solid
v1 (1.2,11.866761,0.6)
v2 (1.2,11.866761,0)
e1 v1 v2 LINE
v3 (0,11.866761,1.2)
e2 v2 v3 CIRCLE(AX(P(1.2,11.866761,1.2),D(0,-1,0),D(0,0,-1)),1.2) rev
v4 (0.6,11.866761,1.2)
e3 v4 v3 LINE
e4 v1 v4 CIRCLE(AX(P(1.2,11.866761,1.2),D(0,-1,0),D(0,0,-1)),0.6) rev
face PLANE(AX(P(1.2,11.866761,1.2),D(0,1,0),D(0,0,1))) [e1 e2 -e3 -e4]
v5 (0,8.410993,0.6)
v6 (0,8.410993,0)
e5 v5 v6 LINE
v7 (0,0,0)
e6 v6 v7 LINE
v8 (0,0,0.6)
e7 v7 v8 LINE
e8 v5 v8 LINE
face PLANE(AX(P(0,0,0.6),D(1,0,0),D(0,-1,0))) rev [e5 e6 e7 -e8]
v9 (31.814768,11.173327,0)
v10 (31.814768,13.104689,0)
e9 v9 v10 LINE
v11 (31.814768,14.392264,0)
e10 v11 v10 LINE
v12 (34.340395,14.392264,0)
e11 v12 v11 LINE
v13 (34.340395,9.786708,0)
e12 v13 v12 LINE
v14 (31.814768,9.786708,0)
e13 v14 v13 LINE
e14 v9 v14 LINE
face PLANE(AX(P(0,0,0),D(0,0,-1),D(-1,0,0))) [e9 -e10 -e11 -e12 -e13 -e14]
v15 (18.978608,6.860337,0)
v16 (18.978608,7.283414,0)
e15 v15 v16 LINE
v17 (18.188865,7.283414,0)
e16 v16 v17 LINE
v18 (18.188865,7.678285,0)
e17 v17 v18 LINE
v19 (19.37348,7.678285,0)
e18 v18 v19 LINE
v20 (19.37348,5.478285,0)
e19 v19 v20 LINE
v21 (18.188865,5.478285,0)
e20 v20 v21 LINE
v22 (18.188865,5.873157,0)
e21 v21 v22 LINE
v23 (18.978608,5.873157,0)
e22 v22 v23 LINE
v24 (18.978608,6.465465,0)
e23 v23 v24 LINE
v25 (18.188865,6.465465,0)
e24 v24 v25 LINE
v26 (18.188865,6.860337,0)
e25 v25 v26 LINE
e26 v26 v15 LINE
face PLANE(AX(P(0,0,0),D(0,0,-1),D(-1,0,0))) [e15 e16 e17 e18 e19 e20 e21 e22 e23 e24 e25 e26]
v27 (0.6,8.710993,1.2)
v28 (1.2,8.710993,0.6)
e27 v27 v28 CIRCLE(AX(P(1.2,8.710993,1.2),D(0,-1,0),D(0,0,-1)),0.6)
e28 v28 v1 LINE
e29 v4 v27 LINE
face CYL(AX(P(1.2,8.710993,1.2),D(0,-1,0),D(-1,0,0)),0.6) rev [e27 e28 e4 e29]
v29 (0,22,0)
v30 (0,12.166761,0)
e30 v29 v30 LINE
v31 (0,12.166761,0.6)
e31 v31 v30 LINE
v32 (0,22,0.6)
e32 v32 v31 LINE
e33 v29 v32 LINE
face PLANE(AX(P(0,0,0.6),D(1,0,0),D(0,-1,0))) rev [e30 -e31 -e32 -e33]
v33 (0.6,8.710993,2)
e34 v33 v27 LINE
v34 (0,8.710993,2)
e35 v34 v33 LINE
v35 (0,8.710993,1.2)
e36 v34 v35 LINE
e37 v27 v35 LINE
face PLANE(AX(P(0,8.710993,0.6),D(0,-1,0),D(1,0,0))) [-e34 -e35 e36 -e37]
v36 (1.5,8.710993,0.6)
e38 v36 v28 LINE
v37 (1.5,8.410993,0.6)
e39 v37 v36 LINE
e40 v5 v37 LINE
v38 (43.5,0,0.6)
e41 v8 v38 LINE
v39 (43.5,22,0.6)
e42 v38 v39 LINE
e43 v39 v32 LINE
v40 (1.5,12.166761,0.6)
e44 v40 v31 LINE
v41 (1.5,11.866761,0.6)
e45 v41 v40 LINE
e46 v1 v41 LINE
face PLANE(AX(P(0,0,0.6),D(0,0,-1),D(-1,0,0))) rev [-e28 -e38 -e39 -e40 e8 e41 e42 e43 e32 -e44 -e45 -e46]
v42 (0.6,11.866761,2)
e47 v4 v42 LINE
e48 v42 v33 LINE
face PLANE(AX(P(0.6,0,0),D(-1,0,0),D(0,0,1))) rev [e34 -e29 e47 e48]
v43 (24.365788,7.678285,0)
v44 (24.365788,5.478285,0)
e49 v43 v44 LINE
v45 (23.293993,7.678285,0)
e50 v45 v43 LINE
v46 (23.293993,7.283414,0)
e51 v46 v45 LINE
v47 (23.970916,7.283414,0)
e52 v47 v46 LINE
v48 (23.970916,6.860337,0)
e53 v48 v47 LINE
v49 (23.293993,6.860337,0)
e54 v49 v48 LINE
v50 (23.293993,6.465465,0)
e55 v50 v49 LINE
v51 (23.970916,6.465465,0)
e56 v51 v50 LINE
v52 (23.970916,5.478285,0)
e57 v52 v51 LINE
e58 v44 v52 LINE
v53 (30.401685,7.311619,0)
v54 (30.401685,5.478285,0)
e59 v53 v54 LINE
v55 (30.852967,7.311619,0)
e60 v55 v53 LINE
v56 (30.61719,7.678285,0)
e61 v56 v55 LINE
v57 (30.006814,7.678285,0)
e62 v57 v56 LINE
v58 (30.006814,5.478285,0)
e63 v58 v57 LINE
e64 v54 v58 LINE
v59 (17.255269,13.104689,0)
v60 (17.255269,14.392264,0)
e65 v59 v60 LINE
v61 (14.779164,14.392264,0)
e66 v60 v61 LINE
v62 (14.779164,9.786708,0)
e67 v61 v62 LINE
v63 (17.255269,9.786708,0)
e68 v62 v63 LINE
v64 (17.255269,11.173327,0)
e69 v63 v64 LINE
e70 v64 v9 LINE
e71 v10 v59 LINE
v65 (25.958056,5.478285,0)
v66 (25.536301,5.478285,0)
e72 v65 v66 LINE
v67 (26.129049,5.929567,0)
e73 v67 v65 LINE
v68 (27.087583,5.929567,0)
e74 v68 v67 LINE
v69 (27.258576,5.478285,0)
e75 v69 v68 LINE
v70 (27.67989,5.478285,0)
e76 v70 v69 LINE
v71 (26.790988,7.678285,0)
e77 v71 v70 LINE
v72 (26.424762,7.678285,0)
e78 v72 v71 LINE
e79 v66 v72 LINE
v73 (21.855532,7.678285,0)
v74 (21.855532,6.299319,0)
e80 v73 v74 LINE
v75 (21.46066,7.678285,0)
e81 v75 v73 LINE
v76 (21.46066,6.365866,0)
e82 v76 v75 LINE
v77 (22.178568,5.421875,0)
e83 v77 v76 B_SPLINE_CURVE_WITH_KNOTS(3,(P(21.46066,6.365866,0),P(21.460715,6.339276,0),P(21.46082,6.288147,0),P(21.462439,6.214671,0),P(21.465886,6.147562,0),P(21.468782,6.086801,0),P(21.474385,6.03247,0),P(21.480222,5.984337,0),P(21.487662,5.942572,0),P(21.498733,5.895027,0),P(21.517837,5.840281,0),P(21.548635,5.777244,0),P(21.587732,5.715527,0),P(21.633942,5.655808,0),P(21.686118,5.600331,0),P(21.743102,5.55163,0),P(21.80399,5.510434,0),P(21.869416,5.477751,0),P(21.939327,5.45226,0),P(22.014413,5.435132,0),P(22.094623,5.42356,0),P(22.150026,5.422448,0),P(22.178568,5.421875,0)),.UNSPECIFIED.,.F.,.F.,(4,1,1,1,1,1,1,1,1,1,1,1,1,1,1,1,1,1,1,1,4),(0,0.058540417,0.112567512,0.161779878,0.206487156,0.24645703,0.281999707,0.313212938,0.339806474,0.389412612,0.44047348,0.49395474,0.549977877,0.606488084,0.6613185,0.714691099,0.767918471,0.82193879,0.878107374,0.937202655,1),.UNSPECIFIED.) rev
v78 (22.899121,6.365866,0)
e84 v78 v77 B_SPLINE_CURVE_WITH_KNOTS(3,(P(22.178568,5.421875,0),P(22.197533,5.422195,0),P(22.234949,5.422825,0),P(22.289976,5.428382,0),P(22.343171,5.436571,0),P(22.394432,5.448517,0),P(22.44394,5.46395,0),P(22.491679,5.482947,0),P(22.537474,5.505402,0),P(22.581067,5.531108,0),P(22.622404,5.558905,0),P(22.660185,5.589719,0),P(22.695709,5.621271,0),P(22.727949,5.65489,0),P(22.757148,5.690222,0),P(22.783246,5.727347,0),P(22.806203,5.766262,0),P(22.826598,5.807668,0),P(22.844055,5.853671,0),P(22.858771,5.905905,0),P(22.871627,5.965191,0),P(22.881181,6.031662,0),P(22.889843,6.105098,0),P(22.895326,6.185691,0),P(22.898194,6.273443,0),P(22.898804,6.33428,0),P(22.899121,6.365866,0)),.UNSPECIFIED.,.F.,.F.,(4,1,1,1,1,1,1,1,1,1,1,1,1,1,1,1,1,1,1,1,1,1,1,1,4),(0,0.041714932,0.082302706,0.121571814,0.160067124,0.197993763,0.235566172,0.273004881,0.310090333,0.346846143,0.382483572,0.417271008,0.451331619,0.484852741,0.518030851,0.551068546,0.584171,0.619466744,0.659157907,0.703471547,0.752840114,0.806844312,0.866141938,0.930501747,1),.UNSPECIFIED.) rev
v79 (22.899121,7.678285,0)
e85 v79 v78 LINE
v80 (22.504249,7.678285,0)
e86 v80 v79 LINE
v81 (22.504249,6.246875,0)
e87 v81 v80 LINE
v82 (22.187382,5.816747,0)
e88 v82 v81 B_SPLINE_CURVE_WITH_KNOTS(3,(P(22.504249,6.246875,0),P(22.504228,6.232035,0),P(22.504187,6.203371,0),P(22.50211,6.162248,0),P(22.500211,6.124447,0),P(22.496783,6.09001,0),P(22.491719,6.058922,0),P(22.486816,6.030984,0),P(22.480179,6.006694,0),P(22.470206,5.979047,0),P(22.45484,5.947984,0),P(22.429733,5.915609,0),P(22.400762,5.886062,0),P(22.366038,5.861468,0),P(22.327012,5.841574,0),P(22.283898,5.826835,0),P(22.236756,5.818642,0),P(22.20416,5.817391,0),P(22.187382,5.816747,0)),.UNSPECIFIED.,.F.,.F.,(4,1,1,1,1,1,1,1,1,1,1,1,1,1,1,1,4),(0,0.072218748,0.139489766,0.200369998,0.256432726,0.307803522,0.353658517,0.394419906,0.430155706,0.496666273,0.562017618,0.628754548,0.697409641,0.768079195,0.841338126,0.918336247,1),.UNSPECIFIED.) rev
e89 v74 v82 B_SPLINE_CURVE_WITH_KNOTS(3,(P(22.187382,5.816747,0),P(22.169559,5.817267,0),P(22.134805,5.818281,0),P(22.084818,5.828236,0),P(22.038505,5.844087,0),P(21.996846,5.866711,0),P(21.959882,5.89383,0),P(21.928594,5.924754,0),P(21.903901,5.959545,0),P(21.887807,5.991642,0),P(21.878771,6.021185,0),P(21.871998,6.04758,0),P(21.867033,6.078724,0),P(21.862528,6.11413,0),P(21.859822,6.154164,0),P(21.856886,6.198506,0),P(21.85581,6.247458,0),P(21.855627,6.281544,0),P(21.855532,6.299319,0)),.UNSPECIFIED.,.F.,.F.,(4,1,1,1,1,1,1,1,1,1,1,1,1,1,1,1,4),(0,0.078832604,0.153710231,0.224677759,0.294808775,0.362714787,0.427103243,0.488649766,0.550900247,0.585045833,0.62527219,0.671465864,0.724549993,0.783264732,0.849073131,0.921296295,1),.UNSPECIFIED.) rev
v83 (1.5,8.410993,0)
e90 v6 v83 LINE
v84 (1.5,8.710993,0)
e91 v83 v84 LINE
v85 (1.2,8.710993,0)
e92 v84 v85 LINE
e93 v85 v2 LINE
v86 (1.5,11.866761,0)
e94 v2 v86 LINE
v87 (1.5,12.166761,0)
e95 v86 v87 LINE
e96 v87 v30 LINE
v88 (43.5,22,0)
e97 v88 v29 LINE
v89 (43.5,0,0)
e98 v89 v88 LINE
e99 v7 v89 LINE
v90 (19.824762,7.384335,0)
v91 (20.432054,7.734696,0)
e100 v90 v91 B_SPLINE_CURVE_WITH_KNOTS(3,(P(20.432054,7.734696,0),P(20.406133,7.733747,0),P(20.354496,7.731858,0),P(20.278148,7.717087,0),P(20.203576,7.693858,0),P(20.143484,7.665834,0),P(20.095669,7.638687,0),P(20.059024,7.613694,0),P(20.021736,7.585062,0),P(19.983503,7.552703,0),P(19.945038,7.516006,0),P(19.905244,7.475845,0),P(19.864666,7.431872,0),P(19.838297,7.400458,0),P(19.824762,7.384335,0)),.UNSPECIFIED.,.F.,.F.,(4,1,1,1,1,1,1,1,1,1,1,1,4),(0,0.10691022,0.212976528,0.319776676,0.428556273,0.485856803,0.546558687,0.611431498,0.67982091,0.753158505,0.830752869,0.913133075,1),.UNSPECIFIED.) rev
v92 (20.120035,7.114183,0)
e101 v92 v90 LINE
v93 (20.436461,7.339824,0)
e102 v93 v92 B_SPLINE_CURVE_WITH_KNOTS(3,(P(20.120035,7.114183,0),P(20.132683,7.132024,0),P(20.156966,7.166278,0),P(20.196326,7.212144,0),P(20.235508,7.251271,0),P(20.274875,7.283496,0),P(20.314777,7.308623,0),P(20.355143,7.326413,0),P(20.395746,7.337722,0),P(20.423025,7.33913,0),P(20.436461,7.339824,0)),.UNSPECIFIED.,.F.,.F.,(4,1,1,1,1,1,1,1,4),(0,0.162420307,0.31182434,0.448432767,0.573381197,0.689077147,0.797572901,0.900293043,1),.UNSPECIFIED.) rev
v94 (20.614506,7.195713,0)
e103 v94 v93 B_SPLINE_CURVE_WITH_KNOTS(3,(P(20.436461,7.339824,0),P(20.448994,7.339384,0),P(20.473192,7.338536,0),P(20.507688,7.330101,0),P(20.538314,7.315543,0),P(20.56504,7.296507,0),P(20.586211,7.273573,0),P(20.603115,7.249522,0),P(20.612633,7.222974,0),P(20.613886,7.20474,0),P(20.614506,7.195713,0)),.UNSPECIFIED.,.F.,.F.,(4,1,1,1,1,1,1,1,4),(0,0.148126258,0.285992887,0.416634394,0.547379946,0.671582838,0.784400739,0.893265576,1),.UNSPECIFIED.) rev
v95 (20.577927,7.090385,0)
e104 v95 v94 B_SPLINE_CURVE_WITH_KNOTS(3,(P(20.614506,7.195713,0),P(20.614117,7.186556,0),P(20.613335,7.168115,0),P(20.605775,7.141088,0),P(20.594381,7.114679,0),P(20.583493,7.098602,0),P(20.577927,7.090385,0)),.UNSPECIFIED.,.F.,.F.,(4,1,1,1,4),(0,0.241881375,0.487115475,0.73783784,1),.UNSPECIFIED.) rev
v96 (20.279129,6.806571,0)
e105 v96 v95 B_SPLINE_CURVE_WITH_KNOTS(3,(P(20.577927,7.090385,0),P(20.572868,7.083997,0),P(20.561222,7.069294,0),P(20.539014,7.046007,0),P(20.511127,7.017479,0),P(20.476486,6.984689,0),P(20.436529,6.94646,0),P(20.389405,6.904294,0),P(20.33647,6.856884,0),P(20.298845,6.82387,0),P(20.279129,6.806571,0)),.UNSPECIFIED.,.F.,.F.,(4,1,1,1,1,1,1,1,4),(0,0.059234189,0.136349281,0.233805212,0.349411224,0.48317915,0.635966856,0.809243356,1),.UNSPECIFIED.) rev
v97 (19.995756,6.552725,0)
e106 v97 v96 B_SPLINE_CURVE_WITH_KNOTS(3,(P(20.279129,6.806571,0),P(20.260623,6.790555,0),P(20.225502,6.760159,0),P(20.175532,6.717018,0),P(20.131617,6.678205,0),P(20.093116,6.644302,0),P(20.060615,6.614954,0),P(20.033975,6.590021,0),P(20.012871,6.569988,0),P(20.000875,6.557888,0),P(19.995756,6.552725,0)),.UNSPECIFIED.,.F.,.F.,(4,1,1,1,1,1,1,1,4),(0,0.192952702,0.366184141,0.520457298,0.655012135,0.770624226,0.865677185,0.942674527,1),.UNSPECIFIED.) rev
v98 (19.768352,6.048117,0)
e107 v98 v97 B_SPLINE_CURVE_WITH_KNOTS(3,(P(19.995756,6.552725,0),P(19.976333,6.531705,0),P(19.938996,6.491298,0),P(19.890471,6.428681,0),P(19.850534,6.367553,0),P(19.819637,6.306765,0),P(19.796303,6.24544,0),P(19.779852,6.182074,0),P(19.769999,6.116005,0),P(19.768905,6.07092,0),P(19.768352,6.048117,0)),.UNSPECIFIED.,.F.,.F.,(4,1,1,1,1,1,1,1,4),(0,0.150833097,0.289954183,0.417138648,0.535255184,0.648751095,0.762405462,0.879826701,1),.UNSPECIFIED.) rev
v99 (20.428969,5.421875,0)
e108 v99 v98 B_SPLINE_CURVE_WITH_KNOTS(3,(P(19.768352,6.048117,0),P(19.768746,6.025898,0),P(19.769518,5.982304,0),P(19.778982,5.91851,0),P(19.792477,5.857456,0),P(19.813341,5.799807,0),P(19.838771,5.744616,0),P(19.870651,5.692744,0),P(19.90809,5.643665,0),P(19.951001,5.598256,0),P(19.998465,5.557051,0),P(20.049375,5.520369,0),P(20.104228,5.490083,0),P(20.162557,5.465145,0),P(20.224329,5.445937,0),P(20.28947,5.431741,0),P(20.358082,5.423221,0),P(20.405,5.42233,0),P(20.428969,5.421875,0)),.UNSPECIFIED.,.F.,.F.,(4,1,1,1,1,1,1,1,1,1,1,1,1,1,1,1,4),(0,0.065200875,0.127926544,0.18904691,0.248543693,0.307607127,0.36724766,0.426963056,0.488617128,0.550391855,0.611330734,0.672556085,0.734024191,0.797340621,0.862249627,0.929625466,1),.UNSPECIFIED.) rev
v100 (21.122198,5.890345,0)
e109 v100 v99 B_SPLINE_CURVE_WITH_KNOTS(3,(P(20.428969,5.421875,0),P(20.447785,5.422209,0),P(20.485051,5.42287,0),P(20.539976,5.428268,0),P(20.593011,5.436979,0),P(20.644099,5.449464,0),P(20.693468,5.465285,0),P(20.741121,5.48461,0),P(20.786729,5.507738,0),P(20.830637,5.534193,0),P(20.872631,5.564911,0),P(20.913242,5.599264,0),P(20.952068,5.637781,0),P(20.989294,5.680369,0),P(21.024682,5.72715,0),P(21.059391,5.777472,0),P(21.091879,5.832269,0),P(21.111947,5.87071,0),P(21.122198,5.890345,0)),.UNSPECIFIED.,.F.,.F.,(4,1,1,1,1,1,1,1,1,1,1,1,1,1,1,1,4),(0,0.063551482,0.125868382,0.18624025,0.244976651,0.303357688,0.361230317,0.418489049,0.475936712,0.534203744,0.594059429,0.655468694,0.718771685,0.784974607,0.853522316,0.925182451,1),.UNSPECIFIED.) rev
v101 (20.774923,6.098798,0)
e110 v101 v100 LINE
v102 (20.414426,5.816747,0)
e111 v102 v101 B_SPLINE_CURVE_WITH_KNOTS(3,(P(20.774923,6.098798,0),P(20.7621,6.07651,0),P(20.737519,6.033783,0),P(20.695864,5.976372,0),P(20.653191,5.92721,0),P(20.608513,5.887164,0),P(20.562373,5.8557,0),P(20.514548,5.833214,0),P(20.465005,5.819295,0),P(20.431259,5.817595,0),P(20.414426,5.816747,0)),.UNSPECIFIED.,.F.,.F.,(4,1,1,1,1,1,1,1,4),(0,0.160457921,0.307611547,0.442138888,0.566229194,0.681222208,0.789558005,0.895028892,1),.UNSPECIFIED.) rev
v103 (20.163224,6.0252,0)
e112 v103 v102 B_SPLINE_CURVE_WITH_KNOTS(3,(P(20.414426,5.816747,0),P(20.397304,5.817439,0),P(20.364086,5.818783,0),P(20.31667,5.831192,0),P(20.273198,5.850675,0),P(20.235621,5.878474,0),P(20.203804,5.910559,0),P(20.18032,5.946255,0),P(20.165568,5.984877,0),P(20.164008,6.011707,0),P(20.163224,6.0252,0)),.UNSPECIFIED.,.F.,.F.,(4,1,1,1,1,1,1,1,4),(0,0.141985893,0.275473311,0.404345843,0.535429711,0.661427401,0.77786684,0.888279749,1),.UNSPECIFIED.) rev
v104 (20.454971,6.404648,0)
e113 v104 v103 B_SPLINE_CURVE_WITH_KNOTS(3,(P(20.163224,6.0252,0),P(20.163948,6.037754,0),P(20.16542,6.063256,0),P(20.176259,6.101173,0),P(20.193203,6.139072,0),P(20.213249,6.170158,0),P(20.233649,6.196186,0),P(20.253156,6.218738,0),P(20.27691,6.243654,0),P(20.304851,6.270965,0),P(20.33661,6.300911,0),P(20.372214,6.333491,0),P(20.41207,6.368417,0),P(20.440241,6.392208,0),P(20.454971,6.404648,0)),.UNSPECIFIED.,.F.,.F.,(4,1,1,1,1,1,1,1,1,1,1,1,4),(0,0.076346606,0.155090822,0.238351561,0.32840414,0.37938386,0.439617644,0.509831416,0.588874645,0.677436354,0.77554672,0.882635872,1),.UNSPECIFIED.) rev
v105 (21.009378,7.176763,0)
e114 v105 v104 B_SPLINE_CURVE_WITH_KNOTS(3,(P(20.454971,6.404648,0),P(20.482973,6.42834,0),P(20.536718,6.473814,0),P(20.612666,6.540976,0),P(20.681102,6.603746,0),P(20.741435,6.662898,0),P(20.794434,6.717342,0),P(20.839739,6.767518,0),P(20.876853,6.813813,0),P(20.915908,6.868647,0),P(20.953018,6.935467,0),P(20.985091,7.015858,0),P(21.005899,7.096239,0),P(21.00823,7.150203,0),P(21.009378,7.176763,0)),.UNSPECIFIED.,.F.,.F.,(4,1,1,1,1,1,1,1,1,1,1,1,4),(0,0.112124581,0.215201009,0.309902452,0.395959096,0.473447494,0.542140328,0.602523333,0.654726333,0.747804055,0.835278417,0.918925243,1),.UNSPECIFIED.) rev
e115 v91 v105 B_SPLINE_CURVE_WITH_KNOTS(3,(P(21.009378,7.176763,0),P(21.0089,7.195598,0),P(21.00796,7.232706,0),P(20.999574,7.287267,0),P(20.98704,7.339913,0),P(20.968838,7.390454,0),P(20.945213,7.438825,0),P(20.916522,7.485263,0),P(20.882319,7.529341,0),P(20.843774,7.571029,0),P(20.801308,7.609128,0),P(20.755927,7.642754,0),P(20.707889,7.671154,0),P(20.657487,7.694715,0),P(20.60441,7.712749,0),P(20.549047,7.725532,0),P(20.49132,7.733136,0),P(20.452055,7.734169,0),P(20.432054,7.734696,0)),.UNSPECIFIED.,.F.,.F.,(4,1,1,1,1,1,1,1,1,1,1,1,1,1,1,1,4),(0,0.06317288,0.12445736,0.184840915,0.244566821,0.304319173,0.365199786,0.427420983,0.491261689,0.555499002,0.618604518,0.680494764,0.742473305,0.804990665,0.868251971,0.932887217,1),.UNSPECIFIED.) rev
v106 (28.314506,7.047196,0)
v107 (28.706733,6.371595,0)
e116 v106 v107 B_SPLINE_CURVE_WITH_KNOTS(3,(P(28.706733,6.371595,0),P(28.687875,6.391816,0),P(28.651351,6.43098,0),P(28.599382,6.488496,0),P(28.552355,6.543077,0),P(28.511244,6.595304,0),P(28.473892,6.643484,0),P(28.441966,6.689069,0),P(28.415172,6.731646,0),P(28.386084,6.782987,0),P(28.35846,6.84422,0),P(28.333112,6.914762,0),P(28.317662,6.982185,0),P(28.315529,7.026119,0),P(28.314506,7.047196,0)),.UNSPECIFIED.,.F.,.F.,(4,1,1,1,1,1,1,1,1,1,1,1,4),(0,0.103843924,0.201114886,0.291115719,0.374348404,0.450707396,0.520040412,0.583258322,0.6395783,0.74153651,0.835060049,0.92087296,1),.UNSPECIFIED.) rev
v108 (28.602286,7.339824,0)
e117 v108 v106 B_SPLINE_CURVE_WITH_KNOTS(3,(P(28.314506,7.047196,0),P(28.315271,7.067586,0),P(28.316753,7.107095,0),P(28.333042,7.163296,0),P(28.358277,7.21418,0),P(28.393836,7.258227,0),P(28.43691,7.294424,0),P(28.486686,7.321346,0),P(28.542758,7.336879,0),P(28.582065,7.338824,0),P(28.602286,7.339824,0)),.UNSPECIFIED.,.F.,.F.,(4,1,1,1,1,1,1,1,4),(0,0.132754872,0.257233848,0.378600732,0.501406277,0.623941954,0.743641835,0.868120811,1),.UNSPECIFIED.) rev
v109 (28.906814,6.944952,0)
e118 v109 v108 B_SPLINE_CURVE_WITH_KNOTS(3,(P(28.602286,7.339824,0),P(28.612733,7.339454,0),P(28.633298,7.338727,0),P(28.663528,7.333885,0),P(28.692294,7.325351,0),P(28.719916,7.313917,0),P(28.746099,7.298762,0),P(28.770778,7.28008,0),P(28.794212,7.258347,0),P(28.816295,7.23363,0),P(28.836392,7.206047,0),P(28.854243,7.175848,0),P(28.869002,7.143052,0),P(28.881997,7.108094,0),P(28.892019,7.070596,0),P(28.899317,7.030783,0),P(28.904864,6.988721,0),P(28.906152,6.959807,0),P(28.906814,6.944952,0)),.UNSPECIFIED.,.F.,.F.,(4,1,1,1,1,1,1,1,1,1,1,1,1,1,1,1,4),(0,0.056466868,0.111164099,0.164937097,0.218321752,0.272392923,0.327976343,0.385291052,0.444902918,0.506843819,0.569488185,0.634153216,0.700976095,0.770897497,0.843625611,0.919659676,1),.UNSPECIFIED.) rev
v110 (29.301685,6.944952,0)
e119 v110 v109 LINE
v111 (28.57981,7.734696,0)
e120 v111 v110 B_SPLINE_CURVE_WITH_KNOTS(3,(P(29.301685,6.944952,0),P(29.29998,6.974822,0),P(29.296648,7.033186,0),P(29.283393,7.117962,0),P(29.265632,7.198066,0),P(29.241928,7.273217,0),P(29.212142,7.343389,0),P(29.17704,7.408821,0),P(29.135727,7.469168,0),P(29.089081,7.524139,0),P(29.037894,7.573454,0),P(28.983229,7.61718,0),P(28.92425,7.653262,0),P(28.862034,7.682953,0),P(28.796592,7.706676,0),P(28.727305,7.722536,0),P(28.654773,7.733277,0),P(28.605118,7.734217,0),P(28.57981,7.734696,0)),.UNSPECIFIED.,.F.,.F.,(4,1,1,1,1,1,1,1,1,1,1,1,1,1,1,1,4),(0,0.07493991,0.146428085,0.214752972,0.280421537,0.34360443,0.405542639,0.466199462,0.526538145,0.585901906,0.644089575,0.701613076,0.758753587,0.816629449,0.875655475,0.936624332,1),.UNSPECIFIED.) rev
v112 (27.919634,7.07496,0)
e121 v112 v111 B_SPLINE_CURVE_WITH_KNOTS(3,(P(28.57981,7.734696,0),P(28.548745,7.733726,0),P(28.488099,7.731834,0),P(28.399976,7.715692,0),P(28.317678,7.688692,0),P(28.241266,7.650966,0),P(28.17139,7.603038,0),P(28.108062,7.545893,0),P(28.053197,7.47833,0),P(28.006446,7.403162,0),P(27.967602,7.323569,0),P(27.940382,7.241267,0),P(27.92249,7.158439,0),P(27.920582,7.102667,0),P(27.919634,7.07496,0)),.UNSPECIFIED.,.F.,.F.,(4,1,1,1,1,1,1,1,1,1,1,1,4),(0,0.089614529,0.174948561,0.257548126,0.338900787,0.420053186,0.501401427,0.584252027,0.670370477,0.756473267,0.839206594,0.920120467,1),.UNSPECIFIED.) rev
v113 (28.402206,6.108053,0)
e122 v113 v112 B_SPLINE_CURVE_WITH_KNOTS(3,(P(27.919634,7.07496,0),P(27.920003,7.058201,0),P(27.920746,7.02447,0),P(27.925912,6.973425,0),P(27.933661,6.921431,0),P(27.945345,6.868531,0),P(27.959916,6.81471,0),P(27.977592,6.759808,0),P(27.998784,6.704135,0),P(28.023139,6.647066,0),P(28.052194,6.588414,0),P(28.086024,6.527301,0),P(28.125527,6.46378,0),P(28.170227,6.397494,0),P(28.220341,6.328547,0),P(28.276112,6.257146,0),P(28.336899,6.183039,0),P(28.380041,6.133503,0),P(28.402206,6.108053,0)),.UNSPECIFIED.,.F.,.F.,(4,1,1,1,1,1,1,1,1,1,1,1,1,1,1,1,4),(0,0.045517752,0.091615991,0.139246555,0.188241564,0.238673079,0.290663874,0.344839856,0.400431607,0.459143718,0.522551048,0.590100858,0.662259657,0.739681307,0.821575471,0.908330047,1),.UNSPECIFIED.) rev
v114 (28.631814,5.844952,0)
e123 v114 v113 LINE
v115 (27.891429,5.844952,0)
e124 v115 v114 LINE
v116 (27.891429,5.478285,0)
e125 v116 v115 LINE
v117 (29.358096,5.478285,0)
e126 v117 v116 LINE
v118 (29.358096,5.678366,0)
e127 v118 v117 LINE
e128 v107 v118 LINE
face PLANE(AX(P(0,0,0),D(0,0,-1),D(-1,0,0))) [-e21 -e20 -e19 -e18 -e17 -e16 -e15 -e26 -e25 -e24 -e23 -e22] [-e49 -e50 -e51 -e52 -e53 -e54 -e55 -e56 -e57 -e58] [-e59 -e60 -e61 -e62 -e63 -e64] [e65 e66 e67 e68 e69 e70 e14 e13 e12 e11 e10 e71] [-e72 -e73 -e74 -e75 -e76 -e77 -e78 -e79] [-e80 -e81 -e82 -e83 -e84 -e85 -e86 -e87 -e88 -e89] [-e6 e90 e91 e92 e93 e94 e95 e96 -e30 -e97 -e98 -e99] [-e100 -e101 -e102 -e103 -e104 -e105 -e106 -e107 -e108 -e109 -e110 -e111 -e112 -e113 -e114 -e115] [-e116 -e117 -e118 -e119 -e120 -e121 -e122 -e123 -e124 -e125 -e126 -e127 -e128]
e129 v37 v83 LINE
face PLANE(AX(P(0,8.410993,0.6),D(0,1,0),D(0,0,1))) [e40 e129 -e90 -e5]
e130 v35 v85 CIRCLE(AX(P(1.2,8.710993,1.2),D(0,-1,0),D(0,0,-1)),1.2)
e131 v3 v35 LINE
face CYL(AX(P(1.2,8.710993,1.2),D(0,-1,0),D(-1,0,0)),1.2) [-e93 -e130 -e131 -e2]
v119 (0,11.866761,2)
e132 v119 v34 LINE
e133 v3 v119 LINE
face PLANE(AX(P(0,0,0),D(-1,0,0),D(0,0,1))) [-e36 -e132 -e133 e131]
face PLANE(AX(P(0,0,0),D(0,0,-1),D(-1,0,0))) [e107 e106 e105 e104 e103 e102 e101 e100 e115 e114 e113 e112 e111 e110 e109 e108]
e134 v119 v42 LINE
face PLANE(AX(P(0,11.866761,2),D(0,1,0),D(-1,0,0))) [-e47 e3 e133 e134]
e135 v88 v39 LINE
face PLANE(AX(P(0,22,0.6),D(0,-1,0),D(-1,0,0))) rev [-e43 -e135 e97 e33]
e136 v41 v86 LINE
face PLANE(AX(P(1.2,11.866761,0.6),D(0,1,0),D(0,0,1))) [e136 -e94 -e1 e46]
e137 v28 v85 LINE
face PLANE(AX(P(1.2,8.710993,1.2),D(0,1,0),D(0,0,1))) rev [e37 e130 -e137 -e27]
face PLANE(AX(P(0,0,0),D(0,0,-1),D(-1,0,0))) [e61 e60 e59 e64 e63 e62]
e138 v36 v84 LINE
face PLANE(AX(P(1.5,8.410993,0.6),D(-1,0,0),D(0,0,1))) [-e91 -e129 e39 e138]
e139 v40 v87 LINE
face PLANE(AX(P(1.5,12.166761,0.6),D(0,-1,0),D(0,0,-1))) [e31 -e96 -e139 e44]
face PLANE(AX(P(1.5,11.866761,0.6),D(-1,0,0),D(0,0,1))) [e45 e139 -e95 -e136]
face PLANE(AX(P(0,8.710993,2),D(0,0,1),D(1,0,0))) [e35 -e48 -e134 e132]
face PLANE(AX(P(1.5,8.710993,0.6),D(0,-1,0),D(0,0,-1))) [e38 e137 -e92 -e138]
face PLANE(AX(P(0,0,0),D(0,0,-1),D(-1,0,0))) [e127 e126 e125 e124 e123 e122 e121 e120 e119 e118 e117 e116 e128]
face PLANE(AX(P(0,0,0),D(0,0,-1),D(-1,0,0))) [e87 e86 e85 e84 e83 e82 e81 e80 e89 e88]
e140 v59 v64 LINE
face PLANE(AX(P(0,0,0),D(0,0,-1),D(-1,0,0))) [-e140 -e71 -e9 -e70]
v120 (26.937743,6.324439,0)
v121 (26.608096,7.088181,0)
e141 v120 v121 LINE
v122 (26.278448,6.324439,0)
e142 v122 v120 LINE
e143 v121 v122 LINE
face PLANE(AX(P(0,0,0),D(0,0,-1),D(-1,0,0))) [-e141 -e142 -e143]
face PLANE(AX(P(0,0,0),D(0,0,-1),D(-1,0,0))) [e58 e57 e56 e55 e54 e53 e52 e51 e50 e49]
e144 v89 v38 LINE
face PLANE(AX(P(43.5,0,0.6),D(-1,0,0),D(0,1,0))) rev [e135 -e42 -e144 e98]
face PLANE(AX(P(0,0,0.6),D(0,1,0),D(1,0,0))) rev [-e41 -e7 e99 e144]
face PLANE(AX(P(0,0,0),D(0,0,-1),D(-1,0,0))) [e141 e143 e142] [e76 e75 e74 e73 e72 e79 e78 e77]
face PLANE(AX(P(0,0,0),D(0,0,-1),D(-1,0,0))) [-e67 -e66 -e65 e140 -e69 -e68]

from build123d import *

# Parameters (mm, degrees)
SKETCH3_W                     = 43.5
SKETCH3_H                     = 22
BOSS_EXTRUDE3_DEPTH           = 0.6
EDGE_FLANGE1_STRIP_W          = 3.6
EDGE_FLANGE1_STRIP_H          = 0.6
EDGE_FLANGE1_STRIP_CUT_DEPTH  = 3.155767649
EDGE_FLANGE1_RELIEF_W         = 3.9
EDGE_FLANGE1_RELIEF_H         = 0.3
EDGE_FLANGE1_RELIEF_CUT_DEPTH = 0.6
EDGE_FLANGE1_DEPTH            = 3.155767649


# Sheet-metal steps are written as plain solids
with BuildPart() as part:
    # Sketch3 → Boss-Extrude3 (new body)
    with BuildSketch(Plane.XY):
        with Locations((21.75, 11)):
            Rectangle(SKETCH3_W, SKETCH3_H)
    extrude(amount=BOSS_EXTRUDE3_DEPTH)

    # Edge-Flange1 strip (across the edge) → Edge-Flange1 strip cut (cut)
    with BuildSketch(Plane(origin=(0, 11.866760766, 0.6), x_dir=(1, 0, 0), z_dir=(0, -1, 0))):
        with Locations((-0.6, -0.3)):
            Rectangle(EDGE_FLANGE1_STRIP_W, EDGE_FLANGE1_STRIP_H)
    extrude(amount=EDGE_FLANGE1_STRIP_CUT_DEPTH, mode=Mode.SUBTRACT)

    # Edge-Flange1 relief (on the sheet) → Edge-Flange1 relief cut (cut)
    with BuildSketch(Plane(origin=(1.2, 11.866760766, 0.6), x_dir=(1, 0, 0), z_dir=(0, 0, 1))):
        with Locations((-1.65, 0.15)):
            Rectangle(EDGE_FLANGE1_RELIEF_W, EDGE_FLANGE1_RELIEF_H)
        with Locations((-1.65, -3.305767649)):
            Rectangle(EDGE_FLANGE1_RELIEF_W, EDGE_FLANGE1_RELIEF_H)
    extrude(amount=-EDGE_FLANGE1_RELIEF_CUT_DEPTH, mode=Mode.SUBTRACT)

    # Edge-Flange1 section (across the edge) → Edge-Flange1 (add)
    with BuildSketch(Plane(origin=(0, 11.866760766, 0.6), x_dir=(1, 0, 0), z_dir=(0, -1, 0))):
        with BuildLine():
            Line((0, 0.6), (0, 1.4))
            Line((0, 1.4), (0.6, 1.4))
            Line((0.6, 1.4), (0.6, 0.6))
            ThreePointArc((0.6, 0.6), (0.775735931, 0.175735931), (1.2, 0))
            Line((1.2, 0), (1.2, -0.6))
            ThreePointArc((1.2, -0.6), (0.351471863, -0.248528137), (0, 0.6))
        make_face()
    extrude(amount=EDGE_FLANGE1_DEPTH)


solid = part.part
